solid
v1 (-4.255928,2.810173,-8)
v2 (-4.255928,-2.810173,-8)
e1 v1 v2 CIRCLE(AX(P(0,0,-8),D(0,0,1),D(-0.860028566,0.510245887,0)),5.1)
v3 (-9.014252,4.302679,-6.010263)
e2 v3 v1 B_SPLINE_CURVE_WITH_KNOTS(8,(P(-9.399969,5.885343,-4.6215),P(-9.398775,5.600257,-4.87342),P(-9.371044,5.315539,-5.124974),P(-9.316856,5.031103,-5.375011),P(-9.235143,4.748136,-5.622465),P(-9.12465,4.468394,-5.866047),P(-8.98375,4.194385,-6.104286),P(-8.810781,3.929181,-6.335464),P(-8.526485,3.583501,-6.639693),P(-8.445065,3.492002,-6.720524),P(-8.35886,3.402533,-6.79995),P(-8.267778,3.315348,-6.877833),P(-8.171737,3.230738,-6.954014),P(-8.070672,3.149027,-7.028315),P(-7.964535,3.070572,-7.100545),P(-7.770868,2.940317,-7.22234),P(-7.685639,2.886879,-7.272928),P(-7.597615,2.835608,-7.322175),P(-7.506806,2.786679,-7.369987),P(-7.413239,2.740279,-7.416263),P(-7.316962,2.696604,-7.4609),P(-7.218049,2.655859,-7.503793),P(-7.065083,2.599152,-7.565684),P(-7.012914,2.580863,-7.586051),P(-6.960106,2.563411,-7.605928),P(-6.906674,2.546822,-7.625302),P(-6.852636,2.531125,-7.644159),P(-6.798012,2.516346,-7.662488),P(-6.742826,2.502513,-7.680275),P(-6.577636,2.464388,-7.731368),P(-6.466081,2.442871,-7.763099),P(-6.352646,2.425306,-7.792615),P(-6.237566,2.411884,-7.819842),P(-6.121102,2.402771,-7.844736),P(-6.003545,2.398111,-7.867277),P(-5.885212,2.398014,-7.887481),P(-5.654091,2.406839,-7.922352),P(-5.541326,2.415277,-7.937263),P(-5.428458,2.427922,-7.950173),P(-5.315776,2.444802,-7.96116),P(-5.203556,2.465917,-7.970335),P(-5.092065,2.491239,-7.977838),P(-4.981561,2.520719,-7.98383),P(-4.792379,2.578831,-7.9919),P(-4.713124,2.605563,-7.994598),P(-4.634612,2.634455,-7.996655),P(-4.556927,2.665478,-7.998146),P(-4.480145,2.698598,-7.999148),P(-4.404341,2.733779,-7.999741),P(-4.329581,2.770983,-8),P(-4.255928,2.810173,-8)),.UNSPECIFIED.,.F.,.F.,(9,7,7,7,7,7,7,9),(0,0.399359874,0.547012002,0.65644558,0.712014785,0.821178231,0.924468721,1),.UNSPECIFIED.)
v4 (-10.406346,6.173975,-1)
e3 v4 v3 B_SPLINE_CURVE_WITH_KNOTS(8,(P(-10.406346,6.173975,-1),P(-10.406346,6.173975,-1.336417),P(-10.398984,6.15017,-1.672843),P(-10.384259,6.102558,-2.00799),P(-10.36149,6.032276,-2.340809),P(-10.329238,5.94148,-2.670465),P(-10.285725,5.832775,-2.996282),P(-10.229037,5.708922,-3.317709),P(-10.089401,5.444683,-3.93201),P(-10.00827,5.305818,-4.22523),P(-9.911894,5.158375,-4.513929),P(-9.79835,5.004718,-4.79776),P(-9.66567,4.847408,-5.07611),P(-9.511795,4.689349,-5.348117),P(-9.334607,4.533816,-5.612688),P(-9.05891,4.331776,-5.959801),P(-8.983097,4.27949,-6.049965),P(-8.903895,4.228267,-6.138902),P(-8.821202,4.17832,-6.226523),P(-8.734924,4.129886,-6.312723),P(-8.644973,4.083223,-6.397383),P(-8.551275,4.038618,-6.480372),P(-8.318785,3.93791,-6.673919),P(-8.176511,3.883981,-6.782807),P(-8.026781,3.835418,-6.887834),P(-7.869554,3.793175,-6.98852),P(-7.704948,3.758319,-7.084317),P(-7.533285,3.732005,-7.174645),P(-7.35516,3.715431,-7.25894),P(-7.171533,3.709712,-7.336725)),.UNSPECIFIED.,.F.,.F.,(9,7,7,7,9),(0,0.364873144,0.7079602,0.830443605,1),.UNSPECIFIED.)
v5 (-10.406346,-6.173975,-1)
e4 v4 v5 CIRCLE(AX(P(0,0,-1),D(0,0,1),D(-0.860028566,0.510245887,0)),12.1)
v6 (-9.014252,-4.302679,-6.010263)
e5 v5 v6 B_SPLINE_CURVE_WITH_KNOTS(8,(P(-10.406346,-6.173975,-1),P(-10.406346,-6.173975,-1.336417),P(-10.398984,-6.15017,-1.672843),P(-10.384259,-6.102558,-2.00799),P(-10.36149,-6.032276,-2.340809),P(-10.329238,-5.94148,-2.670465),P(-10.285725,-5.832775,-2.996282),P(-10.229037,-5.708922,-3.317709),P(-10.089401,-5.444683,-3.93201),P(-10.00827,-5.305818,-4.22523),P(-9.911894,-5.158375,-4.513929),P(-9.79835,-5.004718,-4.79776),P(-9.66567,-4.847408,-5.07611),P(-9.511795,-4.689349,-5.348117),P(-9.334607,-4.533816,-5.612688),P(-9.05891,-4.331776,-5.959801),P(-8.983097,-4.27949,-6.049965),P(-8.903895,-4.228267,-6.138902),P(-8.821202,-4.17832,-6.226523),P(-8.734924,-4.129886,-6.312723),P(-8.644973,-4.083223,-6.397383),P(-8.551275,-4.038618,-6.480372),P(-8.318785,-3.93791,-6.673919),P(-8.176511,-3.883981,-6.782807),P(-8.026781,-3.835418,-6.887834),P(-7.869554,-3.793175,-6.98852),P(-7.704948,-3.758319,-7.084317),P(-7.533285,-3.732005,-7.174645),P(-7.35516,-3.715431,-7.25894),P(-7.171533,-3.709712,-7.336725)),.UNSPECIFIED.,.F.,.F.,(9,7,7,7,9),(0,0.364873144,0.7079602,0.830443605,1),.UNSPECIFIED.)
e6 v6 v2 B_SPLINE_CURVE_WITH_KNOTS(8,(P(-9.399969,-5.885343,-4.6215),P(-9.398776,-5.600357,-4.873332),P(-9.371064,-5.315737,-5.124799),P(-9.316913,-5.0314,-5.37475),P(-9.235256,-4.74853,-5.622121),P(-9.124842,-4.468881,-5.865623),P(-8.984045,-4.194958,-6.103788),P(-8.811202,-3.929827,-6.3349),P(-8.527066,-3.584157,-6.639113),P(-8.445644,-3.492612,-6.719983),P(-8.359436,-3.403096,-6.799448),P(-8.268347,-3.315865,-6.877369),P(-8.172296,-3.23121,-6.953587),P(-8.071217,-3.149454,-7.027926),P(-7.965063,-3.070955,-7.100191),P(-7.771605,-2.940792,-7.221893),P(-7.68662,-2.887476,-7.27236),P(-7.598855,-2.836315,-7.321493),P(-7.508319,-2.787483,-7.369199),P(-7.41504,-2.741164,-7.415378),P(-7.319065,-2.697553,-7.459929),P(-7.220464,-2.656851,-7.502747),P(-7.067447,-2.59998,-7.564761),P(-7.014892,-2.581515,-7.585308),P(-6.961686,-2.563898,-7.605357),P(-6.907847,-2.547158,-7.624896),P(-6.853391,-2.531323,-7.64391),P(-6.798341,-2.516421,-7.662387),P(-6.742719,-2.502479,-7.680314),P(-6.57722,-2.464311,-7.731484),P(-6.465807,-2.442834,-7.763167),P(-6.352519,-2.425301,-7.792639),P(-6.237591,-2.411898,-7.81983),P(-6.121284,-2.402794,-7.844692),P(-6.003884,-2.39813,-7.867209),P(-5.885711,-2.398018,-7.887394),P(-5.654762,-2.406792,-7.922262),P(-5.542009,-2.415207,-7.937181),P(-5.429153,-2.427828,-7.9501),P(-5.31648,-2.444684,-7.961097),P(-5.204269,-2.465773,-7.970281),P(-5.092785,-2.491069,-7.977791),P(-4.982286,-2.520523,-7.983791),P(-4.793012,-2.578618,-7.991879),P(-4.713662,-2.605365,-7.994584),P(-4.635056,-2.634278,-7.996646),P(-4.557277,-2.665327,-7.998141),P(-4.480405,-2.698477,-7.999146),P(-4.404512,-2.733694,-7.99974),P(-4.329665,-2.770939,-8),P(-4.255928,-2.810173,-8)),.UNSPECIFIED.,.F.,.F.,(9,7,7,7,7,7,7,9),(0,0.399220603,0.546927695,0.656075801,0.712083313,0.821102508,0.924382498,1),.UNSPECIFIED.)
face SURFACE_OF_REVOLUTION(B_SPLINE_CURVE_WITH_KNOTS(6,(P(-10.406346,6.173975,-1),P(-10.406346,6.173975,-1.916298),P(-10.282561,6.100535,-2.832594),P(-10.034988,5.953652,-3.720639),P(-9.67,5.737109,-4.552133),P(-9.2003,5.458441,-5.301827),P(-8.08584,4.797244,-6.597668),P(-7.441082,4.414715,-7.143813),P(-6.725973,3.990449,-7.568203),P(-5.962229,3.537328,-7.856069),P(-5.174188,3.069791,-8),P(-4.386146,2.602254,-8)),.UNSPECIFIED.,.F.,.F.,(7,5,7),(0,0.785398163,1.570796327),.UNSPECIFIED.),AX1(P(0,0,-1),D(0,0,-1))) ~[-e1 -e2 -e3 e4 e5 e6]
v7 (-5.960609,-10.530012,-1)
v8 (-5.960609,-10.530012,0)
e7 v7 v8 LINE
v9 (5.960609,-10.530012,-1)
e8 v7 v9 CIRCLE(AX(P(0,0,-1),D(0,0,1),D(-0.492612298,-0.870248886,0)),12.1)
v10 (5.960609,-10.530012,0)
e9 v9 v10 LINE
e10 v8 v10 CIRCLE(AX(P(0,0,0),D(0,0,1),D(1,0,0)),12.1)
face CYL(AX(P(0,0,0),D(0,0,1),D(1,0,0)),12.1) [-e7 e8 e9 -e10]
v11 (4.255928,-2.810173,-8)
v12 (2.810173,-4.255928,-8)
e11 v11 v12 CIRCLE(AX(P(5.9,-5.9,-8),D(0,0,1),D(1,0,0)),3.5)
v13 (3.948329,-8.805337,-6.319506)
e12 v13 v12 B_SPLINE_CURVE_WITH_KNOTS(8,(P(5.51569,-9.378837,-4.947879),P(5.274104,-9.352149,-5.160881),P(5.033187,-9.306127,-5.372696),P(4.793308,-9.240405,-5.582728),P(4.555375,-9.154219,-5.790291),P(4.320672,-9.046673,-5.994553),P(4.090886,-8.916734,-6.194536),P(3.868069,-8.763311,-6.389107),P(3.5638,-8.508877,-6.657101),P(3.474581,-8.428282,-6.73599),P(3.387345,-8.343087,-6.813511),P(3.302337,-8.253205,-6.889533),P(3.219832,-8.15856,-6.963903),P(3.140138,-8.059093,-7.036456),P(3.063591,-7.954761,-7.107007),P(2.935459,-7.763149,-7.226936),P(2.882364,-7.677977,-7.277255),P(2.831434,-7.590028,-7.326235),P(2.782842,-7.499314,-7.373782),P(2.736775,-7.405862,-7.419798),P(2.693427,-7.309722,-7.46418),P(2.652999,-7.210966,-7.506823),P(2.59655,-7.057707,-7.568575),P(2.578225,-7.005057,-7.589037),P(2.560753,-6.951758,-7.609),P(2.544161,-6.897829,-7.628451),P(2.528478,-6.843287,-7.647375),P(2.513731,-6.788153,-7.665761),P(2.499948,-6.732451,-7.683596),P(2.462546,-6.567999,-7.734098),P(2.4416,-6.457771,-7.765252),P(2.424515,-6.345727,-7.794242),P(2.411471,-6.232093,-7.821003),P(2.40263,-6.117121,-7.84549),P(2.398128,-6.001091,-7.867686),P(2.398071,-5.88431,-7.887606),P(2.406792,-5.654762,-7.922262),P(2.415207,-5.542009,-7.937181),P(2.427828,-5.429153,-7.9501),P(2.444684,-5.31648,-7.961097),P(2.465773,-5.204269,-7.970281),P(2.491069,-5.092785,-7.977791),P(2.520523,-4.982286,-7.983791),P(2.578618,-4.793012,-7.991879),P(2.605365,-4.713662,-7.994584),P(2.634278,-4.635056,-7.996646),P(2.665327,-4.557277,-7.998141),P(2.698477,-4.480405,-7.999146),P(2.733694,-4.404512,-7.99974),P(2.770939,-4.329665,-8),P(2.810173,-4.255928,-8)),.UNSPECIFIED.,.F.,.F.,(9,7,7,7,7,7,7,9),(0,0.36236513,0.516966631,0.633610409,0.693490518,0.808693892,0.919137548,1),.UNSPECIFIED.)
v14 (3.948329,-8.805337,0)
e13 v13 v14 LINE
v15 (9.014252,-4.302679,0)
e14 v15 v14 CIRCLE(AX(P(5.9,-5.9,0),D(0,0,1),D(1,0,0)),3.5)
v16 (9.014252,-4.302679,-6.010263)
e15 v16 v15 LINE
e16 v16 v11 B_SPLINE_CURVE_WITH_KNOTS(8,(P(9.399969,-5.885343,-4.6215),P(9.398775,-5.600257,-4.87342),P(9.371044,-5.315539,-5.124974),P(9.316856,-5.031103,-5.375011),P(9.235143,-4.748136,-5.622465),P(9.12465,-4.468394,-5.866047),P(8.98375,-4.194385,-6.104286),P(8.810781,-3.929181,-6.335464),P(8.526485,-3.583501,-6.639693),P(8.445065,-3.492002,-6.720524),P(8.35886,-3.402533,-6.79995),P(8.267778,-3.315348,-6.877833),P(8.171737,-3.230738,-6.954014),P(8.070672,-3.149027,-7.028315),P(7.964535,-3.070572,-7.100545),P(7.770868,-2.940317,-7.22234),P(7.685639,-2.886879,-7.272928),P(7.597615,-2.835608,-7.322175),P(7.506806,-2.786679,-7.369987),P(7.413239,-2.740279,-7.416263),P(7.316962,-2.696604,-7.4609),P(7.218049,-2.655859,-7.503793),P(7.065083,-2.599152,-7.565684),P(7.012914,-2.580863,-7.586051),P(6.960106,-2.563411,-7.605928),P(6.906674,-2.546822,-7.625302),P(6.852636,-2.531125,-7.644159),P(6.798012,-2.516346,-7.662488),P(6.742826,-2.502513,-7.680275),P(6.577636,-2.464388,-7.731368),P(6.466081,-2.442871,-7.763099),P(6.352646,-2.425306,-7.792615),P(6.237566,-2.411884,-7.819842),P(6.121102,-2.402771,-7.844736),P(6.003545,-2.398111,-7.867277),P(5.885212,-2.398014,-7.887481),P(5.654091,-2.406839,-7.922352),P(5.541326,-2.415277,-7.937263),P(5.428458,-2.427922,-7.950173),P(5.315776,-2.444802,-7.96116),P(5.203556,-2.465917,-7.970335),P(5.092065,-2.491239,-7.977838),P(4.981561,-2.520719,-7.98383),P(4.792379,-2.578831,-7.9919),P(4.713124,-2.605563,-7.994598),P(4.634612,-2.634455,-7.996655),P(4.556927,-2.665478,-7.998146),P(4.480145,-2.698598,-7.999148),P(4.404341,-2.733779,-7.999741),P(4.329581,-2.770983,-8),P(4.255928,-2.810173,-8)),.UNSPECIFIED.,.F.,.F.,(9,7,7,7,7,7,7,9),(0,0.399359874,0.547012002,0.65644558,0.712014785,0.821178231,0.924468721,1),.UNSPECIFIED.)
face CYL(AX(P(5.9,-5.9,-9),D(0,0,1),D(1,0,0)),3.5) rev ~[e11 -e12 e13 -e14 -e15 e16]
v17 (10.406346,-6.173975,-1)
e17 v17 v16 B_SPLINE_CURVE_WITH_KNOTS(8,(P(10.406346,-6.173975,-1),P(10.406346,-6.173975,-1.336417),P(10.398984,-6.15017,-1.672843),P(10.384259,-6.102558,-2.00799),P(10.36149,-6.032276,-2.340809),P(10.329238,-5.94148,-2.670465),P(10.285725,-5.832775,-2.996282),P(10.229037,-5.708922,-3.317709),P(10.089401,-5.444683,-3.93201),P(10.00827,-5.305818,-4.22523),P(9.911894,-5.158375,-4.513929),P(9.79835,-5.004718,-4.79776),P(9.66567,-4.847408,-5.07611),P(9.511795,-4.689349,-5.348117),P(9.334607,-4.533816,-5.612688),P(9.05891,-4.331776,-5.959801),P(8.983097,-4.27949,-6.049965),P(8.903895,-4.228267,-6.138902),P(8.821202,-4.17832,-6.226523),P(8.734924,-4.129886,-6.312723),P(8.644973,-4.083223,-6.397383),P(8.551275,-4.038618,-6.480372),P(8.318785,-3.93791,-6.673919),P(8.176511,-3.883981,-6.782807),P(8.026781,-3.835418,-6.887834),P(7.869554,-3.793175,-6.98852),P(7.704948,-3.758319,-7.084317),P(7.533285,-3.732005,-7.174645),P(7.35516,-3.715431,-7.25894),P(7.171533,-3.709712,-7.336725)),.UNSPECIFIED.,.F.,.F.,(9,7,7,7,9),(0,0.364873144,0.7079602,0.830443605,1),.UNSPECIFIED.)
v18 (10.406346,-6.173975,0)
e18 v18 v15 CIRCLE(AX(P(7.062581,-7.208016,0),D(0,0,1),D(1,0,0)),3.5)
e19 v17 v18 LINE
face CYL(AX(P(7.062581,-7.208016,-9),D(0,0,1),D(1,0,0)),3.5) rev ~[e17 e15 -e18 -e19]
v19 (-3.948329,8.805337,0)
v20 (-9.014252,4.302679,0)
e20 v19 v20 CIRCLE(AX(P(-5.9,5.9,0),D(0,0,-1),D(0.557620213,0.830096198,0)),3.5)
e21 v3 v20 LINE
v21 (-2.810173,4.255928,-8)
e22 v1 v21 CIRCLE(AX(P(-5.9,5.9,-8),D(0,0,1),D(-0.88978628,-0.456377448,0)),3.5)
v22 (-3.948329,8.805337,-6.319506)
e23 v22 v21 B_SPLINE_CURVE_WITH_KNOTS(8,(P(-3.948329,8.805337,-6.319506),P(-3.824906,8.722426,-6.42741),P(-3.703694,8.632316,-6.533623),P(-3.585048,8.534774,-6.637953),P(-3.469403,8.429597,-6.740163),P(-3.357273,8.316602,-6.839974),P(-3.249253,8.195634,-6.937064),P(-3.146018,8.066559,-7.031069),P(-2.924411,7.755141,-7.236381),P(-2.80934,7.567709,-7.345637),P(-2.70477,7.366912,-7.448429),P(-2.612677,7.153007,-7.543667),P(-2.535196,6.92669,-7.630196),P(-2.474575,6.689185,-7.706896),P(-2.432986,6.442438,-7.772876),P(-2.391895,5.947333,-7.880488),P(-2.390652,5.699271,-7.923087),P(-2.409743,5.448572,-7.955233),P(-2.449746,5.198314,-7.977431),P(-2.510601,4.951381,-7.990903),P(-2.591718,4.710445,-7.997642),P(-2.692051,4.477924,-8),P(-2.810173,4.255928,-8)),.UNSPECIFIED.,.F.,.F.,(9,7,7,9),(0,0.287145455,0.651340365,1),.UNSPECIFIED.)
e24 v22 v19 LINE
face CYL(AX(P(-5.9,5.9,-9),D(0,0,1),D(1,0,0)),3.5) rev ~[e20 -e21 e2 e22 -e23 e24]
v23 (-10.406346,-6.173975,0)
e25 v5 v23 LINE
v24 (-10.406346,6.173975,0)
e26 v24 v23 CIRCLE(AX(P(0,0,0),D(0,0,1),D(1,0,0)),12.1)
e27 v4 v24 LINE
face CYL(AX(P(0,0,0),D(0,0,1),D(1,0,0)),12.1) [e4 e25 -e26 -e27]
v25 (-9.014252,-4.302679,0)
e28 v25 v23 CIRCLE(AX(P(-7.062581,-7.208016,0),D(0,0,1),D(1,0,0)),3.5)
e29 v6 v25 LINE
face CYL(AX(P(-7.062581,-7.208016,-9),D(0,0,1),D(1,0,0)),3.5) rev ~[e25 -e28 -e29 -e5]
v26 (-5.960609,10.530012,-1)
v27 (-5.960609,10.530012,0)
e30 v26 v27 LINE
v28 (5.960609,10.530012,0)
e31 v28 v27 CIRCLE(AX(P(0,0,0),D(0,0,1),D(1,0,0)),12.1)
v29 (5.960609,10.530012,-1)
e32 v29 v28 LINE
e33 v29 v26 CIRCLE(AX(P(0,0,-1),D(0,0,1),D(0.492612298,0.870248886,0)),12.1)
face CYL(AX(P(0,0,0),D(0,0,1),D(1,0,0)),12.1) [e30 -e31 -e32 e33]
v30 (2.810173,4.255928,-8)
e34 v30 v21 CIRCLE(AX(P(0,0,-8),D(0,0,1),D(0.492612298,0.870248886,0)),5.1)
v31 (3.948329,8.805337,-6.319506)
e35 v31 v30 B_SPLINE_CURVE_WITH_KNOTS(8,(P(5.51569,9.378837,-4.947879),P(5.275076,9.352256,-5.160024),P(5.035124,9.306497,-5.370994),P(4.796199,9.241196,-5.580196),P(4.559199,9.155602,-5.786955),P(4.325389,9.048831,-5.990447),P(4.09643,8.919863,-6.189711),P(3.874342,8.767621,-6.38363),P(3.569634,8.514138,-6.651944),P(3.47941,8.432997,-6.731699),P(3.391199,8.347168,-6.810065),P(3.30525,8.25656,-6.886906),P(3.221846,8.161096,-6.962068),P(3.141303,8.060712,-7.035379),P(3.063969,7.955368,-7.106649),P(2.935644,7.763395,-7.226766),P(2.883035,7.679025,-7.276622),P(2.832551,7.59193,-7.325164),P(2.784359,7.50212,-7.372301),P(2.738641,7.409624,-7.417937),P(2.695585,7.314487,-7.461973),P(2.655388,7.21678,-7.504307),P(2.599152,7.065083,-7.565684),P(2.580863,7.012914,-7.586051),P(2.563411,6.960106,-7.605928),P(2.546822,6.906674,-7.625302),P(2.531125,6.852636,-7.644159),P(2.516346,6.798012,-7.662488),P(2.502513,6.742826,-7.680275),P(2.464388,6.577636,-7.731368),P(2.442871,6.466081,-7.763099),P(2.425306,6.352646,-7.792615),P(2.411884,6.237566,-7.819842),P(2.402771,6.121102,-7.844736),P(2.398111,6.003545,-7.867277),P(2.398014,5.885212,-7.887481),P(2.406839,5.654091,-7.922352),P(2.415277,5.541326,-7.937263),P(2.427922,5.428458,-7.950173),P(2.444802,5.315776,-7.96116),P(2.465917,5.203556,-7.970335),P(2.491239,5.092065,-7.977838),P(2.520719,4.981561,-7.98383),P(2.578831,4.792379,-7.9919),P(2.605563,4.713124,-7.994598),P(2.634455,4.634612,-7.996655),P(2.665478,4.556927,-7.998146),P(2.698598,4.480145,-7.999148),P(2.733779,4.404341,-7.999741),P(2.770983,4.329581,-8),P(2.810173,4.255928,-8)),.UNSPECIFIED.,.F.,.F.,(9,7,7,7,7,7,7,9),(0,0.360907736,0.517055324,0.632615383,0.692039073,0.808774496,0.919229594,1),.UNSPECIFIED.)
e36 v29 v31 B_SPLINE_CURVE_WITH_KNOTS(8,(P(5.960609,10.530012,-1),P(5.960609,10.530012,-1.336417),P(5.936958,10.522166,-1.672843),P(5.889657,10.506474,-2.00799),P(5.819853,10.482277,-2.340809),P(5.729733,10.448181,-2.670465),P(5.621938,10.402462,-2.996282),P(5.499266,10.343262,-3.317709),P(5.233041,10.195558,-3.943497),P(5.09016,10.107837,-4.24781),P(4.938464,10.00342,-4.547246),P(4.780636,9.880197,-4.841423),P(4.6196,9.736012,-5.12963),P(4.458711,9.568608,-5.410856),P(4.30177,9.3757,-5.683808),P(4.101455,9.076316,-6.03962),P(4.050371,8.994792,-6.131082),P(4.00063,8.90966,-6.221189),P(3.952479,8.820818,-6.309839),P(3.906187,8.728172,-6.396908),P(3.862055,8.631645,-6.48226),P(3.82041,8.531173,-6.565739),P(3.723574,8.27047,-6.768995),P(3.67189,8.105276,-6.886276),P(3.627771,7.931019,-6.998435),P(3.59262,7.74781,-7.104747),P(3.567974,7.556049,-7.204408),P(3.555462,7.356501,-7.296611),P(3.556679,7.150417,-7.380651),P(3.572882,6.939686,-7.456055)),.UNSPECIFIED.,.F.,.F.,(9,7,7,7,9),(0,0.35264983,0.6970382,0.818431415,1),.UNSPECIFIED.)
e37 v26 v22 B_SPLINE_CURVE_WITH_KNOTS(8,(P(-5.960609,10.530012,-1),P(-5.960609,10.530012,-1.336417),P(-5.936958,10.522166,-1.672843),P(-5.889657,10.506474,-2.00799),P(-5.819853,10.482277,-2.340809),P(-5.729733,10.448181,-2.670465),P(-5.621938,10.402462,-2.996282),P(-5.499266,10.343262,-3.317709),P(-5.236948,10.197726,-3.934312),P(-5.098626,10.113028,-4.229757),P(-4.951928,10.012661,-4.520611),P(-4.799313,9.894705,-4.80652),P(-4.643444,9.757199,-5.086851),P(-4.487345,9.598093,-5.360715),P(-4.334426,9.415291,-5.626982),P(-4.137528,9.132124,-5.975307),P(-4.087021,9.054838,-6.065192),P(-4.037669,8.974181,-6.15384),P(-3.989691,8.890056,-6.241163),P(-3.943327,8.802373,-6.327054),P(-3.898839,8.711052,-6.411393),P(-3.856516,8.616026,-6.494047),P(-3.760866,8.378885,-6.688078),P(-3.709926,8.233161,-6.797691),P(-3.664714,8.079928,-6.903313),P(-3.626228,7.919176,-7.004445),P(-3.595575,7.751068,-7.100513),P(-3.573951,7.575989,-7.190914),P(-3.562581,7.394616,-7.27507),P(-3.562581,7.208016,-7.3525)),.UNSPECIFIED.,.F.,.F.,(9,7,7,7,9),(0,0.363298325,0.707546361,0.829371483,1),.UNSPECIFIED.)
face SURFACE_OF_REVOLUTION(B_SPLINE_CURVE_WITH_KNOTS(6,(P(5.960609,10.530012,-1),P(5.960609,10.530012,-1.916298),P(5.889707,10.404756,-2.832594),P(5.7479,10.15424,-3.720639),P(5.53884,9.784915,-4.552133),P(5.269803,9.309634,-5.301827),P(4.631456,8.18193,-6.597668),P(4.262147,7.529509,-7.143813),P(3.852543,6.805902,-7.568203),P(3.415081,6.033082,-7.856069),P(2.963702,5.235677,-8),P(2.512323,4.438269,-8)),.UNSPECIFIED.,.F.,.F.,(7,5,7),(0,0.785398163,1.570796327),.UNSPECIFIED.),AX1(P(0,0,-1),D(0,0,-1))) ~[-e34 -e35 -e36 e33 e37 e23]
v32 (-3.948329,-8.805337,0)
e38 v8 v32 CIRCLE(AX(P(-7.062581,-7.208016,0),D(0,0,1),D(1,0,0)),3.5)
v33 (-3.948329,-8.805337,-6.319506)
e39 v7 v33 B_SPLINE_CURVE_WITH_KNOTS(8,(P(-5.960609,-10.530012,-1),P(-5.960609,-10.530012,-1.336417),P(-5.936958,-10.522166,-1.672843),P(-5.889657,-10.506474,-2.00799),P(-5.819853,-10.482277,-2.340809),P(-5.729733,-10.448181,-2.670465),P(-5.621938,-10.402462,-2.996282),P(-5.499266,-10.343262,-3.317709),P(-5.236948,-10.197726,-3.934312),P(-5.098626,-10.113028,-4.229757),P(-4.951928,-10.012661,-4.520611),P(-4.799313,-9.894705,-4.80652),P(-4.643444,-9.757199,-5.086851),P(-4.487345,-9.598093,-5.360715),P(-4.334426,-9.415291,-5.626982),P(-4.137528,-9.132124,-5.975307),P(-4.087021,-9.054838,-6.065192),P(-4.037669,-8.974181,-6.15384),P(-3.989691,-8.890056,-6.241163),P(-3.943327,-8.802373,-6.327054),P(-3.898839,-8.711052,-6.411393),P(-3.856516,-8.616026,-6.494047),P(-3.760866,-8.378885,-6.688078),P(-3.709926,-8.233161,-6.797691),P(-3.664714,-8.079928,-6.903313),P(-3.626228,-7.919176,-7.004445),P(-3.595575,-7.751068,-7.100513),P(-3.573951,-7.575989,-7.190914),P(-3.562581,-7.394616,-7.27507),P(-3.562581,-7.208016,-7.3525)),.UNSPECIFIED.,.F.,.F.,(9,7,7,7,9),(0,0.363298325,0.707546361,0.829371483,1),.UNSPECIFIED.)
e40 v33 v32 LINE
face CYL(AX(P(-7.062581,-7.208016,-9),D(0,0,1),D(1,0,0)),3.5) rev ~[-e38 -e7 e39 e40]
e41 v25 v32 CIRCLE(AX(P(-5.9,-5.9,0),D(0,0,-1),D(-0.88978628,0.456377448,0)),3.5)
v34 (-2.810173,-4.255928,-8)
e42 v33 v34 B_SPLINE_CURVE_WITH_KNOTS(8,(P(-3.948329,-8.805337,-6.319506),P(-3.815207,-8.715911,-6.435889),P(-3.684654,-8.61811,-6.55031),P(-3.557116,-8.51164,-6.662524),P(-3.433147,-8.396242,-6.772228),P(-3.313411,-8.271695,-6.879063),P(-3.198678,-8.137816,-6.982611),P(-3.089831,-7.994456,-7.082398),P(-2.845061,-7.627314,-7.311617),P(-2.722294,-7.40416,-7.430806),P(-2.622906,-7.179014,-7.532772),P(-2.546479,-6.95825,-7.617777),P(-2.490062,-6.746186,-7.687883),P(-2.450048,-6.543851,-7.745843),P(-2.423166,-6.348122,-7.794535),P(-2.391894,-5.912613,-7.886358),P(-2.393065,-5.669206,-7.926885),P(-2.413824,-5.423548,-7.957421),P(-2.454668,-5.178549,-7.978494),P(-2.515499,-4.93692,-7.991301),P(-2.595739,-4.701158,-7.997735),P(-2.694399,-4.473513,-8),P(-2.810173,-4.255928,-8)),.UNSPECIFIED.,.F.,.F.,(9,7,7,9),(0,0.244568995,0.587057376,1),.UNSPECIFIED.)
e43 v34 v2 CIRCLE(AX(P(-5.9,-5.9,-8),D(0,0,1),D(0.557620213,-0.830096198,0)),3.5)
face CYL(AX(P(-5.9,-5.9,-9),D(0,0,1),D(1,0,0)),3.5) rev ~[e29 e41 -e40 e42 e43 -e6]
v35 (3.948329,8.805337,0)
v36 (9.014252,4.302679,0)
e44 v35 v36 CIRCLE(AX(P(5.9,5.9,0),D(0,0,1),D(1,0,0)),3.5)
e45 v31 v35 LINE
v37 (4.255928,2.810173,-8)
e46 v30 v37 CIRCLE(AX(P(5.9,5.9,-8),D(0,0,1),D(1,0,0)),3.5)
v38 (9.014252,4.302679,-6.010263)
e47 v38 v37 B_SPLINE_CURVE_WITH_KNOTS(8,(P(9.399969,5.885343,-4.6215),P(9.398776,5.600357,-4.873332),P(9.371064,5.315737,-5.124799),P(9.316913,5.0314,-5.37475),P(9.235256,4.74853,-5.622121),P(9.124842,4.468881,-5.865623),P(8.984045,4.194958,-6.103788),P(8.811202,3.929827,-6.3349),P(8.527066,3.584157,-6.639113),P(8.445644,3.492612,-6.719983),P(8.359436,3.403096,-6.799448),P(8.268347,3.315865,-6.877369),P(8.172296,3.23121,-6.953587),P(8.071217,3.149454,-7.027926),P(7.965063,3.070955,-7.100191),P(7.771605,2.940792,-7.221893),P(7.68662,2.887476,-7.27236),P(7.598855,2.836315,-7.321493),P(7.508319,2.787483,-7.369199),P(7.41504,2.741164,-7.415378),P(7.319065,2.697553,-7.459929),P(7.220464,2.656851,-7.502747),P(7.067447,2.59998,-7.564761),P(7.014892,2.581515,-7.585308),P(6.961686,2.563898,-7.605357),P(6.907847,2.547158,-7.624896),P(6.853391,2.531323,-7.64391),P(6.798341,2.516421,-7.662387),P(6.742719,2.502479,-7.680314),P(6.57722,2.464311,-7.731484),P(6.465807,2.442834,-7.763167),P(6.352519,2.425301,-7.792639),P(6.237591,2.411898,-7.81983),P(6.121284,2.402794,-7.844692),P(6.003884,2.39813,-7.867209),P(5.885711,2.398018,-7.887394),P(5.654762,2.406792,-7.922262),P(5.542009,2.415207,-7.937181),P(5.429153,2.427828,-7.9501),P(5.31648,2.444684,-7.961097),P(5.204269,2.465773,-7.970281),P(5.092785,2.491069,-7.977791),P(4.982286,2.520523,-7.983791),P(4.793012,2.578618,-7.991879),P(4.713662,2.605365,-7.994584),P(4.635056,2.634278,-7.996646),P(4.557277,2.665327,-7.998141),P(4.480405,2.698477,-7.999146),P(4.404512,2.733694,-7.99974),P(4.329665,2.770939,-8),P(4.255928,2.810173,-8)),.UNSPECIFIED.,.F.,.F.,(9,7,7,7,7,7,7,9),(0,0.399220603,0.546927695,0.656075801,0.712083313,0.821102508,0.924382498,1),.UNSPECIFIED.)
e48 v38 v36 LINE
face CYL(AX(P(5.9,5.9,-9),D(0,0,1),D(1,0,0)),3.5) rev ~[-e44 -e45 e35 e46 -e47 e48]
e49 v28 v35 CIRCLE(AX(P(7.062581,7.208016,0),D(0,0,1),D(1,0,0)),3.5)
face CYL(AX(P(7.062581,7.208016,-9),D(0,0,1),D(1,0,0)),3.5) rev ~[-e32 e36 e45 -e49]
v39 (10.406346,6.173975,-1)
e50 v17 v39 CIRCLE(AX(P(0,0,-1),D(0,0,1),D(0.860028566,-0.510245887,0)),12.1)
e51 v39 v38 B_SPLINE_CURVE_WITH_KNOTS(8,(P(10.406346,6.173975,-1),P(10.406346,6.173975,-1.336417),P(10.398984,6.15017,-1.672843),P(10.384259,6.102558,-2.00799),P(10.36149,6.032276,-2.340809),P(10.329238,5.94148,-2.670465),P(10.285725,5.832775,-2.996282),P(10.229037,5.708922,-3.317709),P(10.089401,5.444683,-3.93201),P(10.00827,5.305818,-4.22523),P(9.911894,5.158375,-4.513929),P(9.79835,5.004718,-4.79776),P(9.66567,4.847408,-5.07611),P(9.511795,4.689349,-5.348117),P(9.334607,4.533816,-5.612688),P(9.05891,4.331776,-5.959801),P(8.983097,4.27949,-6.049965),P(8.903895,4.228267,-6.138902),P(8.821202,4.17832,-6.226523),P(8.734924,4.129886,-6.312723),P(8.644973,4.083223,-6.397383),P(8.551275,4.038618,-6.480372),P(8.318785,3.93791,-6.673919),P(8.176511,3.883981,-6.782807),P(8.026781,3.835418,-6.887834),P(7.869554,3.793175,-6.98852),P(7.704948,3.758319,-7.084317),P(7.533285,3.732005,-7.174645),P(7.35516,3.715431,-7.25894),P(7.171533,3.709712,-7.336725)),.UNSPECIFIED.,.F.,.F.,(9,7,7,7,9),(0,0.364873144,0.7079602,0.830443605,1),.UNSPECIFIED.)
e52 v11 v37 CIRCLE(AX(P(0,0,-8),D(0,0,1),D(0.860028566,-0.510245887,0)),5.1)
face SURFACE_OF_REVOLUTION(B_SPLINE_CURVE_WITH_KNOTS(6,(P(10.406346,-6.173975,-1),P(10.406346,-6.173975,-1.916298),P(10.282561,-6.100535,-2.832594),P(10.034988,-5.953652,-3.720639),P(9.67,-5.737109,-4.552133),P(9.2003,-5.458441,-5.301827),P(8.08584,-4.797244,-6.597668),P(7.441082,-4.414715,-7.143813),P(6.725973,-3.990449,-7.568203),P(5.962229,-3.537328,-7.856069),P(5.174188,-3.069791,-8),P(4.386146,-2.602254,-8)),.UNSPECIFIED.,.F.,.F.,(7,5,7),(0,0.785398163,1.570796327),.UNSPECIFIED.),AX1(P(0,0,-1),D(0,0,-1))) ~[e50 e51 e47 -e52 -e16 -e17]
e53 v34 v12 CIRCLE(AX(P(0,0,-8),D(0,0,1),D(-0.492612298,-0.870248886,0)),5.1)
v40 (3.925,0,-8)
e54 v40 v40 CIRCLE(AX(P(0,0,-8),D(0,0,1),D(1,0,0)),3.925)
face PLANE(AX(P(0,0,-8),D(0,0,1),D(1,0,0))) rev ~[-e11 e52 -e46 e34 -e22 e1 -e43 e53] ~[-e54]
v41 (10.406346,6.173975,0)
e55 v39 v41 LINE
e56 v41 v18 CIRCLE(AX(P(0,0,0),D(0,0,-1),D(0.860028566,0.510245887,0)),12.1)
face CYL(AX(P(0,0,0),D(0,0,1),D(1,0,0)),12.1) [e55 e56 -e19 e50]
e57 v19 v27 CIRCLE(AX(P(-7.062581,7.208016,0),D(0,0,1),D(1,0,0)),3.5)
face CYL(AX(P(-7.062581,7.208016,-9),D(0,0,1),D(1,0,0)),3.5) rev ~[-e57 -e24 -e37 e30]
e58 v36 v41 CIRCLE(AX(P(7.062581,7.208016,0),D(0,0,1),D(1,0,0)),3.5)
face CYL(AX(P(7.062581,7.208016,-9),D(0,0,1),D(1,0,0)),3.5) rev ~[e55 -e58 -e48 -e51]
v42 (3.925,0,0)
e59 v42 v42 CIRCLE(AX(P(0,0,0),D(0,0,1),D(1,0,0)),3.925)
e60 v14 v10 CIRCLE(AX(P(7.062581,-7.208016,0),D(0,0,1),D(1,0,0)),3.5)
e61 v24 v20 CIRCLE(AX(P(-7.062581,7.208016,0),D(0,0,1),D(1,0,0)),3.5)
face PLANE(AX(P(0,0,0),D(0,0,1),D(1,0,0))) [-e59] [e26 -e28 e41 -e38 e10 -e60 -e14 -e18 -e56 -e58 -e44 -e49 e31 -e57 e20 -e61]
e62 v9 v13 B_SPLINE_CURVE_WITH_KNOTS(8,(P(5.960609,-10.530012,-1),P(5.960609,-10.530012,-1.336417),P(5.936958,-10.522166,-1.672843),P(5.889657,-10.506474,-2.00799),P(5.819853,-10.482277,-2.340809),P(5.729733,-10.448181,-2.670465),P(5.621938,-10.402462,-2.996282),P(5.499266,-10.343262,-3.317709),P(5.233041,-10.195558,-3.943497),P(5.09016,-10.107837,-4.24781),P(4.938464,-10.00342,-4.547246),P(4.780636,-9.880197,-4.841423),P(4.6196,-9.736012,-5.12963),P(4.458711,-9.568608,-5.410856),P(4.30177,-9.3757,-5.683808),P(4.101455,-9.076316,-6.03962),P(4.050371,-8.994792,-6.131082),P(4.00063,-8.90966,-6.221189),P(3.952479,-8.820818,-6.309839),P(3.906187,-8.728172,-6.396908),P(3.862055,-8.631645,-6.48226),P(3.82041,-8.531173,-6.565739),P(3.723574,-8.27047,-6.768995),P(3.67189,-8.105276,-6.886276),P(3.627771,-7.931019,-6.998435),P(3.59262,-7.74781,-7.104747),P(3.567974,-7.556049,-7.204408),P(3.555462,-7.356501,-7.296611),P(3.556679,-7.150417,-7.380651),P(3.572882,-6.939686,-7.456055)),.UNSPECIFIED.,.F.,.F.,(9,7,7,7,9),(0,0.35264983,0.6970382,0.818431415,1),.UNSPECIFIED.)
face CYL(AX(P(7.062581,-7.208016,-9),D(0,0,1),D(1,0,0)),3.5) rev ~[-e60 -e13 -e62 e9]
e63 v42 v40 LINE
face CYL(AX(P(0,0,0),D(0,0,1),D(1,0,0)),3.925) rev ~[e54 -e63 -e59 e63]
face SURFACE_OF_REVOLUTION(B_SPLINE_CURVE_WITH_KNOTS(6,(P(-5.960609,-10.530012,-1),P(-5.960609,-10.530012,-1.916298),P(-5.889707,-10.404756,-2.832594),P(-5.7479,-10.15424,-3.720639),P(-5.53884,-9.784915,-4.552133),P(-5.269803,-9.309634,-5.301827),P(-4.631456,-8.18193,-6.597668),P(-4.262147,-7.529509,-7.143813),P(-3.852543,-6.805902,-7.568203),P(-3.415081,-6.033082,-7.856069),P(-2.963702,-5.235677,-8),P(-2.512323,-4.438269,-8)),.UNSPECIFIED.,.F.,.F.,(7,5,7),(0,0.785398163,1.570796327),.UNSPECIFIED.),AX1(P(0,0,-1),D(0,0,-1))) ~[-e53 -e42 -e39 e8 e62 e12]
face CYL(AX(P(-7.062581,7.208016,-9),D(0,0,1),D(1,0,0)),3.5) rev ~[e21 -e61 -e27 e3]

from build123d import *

# Parameters (mm, degrees)
F0_R           = 12.1
F0_R_2         = 3.925
F1_DEPTH       = 8
F2_D           = 5
F2_DEPTH       = 12
F2_CBORE_D     = 7
F2_CBORE_DEPTH = 9
F2_TIP         = 1.5021515476
F3_R           = 7


# Not quite as in the source:
# - a feature names something its author has since deleted; it is built from what else it names


with BuildPart() as f1:
    # F0 (on Top) → F1 (new body)
    with BuildSketch(Plane.XY):
        Circle(F0_R)
        with BuildLine():
            Line((-8.3705968588, -6.0454343887), (-7.2080156238, -4.737418765))
            ThreePointArc((-7.2080156238, -4.737418765), (-4.737418765, -4.5919843762), (-4.5919843762, -7.062581235))
            Line((-4.5919843762, -7.062581235), (-5.7545656113, -8.3705968588))
            ThreePointArc((-5.7545656113, -8.3705968588), (-8.22516247, -8.5160312475), (-8.3705968588, -6.0454343887))
        make_face(mode=Mode.SUBTRACT)
        with BuildLine():
            ThreePointArc((4.5919843762, -7.062581235), (4.737418765, -4.5919843762), (7.2080156238, -4.737418765))
            Line((7.2080156238, -4.737418765), (8.3705968588, -6.0454343887))
            ThreePointArc((8.3705968588, -6.0454343887), (8.22516247, -8.5160312475), (5.7545656113, -8.3705968588))
            Line((5.7545656113, -8.3705968588), (4.5919843762, -7.062581235))
        make_face(mode=Mode.SUBTRACT)
        with BuildLine():
            ThreePointArc((-8.3705968588, 6.0454343887), (-8.22516247, 8.5160312475), (-5.7545656113, 8.3705968588))
            Line((-5.7545656113, 8.3705968588), (-4.5919843762, 7.062581235))
            ThreePointArc((-4.5919843762, 7.062581235), (-4.737418765, 4.5919843762), (-7.2080156238, 4.737418765))
            Line((-7.2080156238, 4.737418765), (-8.3705968588, 6.0454343887))
        make_face(mode=Mode.SUBTRACT)
        Circle(F0_R_2, mode=Mode.SUBTRACT)
        with BuildLine():
            Line((8.3705968588, 6.0454343887), (7.2080156238, 4.737418765))
            ThreePointArc((7.2080156238, 4.737418765), (4.737418765, 4.5919843762), (4.5919843762, 7.062581235))
            Line((4.5919843762, 7.062581235), (5.7545656113, 8.3705968588))
            ThreePointArc((5.7545656113, 8.3705968588), (8.22516247, 8.5160312475), (8.3705968588, 6.0454343887))
        make_face(mode=Mode.SUBTRACT)
    extrude(amount=-F1_DEPTH)

    # F2
    with Locations(Plane.XY):
        with Locations((-5.9, 5.9), (-7.062581235, 7.2080156238), (-7.062581235, -7.2080156238), (7.062581235, -7.2080156238), (5.9, -5.9), (5.9, 5.9), (7.062581235, 7.2080156238), (-5.9, -5.9)):
            CounterBoreHole(F2_D / 2, F2_CBORE_D / 2, F2_CBORE_DEPTH, depth=F2_DEPTH)
            with Locations((0, 0, -(F2_DEPTH + F2_TIP / 2))):  # 118° drill point
                Cone(0, F2_D / 2, F2_TIP, mode=Mode.SUBTRACT)

    # F3
    f3_edges = [f1.edges().sort_by_distance(p)[0] for p in [
        (12.1, 0, -8),
        (0, 12.1, -8),
        (-12.1, 0, -8),
        (0, -12.1, -8),
    ]]
    fillet(f3_edges, radius=F3_R)


solid = f1.part
